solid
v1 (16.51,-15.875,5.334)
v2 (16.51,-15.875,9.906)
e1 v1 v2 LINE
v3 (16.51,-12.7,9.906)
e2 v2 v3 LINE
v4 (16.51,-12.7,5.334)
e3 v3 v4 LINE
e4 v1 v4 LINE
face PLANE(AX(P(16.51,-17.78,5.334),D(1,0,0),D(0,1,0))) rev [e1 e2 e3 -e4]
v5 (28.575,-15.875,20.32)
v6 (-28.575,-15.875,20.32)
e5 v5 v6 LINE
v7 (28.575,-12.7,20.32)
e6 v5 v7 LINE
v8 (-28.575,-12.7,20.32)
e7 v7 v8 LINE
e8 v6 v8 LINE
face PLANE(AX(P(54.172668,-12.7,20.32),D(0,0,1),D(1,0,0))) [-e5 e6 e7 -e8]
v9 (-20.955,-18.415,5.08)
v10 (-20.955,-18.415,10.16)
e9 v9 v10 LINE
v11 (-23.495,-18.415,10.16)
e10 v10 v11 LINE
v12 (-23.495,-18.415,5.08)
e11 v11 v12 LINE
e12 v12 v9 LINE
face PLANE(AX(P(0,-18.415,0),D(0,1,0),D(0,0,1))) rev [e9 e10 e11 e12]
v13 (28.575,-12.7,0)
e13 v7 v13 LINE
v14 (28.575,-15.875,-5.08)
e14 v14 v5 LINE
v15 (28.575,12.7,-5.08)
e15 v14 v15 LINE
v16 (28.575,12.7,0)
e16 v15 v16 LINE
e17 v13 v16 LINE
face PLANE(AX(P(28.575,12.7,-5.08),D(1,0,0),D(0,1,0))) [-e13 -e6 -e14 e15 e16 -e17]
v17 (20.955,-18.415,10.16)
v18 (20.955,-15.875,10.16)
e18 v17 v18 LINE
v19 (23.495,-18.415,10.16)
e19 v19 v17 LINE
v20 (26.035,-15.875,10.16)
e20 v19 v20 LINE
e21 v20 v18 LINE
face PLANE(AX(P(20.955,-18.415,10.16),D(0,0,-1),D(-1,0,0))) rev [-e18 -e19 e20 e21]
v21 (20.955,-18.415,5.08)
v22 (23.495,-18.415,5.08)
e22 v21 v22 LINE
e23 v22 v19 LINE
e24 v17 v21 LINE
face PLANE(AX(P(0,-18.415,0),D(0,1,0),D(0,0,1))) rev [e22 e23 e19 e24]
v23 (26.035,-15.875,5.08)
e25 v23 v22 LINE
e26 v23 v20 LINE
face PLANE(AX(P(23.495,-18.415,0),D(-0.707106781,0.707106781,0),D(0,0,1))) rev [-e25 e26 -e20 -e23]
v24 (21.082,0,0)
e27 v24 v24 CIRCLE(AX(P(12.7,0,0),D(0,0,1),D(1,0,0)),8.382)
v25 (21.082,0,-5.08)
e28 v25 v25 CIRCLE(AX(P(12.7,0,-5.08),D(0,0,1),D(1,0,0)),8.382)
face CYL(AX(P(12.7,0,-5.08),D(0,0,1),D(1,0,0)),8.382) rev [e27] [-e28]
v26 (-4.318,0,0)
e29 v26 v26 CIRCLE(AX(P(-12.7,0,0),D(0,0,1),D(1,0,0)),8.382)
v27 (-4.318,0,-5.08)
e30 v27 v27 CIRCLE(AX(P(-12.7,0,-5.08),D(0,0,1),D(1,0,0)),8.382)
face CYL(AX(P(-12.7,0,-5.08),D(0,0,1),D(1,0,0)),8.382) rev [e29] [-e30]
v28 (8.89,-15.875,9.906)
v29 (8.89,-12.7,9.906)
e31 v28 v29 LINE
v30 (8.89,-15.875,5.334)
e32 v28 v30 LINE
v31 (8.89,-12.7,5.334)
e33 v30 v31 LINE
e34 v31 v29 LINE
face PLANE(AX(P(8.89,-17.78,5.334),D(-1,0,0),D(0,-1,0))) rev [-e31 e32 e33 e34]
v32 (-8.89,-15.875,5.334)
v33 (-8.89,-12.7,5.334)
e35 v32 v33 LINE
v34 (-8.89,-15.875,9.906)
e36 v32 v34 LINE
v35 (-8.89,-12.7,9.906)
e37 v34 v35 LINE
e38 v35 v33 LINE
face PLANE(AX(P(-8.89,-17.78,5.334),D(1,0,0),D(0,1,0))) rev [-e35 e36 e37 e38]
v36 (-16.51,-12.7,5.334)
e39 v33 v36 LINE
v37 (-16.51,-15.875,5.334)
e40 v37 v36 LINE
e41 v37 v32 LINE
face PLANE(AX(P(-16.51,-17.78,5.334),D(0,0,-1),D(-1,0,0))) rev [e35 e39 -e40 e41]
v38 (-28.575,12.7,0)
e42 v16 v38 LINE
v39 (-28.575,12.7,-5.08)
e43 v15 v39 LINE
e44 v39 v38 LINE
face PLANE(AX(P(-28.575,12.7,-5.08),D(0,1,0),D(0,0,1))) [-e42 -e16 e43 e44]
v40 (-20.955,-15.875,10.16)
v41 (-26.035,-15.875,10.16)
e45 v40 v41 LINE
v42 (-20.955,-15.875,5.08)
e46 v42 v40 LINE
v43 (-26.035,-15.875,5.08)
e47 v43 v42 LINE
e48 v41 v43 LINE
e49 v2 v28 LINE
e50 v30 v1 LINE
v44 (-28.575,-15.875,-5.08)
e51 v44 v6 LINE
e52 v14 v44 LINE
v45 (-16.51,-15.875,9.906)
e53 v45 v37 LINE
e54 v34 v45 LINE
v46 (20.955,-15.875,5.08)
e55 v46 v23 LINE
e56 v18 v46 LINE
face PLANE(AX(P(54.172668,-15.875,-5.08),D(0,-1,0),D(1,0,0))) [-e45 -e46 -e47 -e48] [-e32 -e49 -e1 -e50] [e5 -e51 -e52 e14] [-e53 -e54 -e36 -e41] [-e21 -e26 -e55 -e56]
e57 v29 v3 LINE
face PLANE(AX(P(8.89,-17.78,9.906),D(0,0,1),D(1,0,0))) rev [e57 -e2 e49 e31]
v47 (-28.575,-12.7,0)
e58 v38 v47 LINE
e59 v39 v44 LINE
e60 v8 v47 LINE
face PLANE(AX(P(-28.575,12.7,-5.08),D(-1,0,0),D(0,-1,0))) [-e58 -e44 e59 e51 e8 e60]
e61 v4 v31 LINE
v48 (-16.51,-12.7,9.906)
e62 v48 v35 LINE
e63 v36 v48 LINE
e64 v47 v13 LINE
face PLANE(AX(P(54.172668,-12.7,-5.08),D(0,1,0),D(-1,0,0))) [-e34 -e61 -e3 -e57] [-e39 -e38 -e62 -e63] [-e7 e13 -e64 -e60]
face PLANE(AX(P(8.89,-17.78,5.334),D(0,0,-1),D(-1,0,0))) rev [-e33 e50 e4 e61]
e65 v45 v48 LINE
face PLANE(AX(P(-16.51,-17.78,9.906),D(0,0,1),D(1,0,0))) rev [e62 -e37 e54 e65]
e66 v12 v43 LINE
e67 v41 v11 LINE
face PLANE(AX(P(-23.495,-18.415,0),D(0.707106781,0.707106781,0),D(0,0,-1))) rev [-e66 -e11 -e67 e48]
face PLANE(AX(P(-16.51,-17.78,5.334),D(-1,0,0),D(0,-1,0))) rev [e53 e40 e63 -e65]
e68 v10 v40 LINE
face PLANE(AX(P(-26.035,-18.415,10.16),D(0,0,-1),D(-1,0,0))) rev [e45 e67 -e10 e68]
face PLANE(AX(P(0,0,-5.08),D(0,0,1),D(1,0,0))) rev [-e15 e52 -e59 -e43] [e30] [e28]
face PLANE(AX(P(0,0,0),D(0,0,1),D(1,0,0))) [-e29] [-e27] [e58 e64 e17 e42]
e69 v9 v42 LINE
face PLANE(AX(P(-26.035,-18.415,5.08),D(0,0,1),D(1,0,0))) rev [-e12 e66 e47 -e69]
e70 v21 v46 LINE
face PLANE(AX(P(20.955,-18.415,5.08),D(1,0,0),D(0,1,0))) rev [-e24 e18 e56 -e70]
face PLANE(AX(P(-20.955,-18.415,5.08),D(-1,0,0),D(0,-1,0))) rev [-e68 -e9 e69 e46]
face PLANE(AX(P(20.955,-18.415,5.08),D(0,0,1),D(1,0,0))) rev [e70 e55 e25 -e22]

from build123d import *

# Parameters (mm, degrees)
SKETCH1_W           = 57.15
SKETCH1_H           = 25.4
SKETCH1_R           = 8.382
BOSS_EXTRUDE1_DEPTH = 5.08
SKETCH3_W           = 25.4
SKETCH3_H           = 3.175
BOSS_EXTRUDE2_DEPTH = 57.15
SKETCH4_W           = 7.62
SKETCH4_H           = 4.572
CUT_EXTRUDE1_DEPTH  = 5.08
SKETCH5_W           = 5.08
SKETCH5_H           = 5.08
BOSS_EXTRUDE3_DEPTH = 2.54
CHAMFER1_SIZE       = 2.54


with BuildPart() as part:
    # Sketch1 → Boss-Extrude1 (new body)
    with BuildSketch(Plane.XY):
        Rectangle(SKETCH1_W, SKETCH1_H)
        with Locations((-12.7, 0)):
            Circle(SKETCH1_R, mode=Mode.SUBTRACT)
        with Locations((12.7, 0)):
            Circle(SKETCH1_R, mode=Mode.SUBTRACT)
    extrude(amount=-BOSS_EXTRUDE1_DEPTH)

    # Sketch3 → Boss-Extrude2 (add)
    with BuildSketch(Plane.ZY.offset(28.575)):
        with Locations((7.62, -14.2875)):
            Rectangle(SKETCH3_W, SKETCH3_H)
    extrude(amount=-BOSS_EXTRUDE2_DEPTH)

    # Sketch4 → Cut-Extrude1 (cut)
    with BuildSketch(Plane(origin=(0, -12.7, 0), x_dir=(1, 0, 0), z_dir=(0, 1, 0))):
        with Locations((-12.7, -7.62)):
            Rectangle(SKETCH4_W, SKETCH4_H)
        with Locations((12.7, -7.62)):
            Rectangle(SKETCH4_W, SKETCH4_H)
    extrude(amount=-CUT_EXTRUDE1_DEPTH, mode=Mode.SUBTRACT)

    # Sketch5 → Boss-Extrude3 (add)
    with BuildSketch(Plane.XZ.offset(15.875)):
        with Locations((-23.495, 7.62)):
            Rectangle(SKETCH5_W, SKETCH5_H)
        with Locations((23.495, 7.62)):
            Rectangle(SKETCH5_W, SKETCH5_H)
    extrude(amount=BOSS_EXTRUDE3_DEPTH)

    # Chamfer1
    chamfer1_edges = [part.edges().sort_by_distance(p)[0] for p in [
        (26.035, -18.415, 7.62),
        (-26.035, -18.415, 7.62),
    ]]
    chamfer(chamfer1_edges, length=CHAMFER1_SIZE - 0.0001)  # a hair under: the kernel refuses the full size


solid = part.part
